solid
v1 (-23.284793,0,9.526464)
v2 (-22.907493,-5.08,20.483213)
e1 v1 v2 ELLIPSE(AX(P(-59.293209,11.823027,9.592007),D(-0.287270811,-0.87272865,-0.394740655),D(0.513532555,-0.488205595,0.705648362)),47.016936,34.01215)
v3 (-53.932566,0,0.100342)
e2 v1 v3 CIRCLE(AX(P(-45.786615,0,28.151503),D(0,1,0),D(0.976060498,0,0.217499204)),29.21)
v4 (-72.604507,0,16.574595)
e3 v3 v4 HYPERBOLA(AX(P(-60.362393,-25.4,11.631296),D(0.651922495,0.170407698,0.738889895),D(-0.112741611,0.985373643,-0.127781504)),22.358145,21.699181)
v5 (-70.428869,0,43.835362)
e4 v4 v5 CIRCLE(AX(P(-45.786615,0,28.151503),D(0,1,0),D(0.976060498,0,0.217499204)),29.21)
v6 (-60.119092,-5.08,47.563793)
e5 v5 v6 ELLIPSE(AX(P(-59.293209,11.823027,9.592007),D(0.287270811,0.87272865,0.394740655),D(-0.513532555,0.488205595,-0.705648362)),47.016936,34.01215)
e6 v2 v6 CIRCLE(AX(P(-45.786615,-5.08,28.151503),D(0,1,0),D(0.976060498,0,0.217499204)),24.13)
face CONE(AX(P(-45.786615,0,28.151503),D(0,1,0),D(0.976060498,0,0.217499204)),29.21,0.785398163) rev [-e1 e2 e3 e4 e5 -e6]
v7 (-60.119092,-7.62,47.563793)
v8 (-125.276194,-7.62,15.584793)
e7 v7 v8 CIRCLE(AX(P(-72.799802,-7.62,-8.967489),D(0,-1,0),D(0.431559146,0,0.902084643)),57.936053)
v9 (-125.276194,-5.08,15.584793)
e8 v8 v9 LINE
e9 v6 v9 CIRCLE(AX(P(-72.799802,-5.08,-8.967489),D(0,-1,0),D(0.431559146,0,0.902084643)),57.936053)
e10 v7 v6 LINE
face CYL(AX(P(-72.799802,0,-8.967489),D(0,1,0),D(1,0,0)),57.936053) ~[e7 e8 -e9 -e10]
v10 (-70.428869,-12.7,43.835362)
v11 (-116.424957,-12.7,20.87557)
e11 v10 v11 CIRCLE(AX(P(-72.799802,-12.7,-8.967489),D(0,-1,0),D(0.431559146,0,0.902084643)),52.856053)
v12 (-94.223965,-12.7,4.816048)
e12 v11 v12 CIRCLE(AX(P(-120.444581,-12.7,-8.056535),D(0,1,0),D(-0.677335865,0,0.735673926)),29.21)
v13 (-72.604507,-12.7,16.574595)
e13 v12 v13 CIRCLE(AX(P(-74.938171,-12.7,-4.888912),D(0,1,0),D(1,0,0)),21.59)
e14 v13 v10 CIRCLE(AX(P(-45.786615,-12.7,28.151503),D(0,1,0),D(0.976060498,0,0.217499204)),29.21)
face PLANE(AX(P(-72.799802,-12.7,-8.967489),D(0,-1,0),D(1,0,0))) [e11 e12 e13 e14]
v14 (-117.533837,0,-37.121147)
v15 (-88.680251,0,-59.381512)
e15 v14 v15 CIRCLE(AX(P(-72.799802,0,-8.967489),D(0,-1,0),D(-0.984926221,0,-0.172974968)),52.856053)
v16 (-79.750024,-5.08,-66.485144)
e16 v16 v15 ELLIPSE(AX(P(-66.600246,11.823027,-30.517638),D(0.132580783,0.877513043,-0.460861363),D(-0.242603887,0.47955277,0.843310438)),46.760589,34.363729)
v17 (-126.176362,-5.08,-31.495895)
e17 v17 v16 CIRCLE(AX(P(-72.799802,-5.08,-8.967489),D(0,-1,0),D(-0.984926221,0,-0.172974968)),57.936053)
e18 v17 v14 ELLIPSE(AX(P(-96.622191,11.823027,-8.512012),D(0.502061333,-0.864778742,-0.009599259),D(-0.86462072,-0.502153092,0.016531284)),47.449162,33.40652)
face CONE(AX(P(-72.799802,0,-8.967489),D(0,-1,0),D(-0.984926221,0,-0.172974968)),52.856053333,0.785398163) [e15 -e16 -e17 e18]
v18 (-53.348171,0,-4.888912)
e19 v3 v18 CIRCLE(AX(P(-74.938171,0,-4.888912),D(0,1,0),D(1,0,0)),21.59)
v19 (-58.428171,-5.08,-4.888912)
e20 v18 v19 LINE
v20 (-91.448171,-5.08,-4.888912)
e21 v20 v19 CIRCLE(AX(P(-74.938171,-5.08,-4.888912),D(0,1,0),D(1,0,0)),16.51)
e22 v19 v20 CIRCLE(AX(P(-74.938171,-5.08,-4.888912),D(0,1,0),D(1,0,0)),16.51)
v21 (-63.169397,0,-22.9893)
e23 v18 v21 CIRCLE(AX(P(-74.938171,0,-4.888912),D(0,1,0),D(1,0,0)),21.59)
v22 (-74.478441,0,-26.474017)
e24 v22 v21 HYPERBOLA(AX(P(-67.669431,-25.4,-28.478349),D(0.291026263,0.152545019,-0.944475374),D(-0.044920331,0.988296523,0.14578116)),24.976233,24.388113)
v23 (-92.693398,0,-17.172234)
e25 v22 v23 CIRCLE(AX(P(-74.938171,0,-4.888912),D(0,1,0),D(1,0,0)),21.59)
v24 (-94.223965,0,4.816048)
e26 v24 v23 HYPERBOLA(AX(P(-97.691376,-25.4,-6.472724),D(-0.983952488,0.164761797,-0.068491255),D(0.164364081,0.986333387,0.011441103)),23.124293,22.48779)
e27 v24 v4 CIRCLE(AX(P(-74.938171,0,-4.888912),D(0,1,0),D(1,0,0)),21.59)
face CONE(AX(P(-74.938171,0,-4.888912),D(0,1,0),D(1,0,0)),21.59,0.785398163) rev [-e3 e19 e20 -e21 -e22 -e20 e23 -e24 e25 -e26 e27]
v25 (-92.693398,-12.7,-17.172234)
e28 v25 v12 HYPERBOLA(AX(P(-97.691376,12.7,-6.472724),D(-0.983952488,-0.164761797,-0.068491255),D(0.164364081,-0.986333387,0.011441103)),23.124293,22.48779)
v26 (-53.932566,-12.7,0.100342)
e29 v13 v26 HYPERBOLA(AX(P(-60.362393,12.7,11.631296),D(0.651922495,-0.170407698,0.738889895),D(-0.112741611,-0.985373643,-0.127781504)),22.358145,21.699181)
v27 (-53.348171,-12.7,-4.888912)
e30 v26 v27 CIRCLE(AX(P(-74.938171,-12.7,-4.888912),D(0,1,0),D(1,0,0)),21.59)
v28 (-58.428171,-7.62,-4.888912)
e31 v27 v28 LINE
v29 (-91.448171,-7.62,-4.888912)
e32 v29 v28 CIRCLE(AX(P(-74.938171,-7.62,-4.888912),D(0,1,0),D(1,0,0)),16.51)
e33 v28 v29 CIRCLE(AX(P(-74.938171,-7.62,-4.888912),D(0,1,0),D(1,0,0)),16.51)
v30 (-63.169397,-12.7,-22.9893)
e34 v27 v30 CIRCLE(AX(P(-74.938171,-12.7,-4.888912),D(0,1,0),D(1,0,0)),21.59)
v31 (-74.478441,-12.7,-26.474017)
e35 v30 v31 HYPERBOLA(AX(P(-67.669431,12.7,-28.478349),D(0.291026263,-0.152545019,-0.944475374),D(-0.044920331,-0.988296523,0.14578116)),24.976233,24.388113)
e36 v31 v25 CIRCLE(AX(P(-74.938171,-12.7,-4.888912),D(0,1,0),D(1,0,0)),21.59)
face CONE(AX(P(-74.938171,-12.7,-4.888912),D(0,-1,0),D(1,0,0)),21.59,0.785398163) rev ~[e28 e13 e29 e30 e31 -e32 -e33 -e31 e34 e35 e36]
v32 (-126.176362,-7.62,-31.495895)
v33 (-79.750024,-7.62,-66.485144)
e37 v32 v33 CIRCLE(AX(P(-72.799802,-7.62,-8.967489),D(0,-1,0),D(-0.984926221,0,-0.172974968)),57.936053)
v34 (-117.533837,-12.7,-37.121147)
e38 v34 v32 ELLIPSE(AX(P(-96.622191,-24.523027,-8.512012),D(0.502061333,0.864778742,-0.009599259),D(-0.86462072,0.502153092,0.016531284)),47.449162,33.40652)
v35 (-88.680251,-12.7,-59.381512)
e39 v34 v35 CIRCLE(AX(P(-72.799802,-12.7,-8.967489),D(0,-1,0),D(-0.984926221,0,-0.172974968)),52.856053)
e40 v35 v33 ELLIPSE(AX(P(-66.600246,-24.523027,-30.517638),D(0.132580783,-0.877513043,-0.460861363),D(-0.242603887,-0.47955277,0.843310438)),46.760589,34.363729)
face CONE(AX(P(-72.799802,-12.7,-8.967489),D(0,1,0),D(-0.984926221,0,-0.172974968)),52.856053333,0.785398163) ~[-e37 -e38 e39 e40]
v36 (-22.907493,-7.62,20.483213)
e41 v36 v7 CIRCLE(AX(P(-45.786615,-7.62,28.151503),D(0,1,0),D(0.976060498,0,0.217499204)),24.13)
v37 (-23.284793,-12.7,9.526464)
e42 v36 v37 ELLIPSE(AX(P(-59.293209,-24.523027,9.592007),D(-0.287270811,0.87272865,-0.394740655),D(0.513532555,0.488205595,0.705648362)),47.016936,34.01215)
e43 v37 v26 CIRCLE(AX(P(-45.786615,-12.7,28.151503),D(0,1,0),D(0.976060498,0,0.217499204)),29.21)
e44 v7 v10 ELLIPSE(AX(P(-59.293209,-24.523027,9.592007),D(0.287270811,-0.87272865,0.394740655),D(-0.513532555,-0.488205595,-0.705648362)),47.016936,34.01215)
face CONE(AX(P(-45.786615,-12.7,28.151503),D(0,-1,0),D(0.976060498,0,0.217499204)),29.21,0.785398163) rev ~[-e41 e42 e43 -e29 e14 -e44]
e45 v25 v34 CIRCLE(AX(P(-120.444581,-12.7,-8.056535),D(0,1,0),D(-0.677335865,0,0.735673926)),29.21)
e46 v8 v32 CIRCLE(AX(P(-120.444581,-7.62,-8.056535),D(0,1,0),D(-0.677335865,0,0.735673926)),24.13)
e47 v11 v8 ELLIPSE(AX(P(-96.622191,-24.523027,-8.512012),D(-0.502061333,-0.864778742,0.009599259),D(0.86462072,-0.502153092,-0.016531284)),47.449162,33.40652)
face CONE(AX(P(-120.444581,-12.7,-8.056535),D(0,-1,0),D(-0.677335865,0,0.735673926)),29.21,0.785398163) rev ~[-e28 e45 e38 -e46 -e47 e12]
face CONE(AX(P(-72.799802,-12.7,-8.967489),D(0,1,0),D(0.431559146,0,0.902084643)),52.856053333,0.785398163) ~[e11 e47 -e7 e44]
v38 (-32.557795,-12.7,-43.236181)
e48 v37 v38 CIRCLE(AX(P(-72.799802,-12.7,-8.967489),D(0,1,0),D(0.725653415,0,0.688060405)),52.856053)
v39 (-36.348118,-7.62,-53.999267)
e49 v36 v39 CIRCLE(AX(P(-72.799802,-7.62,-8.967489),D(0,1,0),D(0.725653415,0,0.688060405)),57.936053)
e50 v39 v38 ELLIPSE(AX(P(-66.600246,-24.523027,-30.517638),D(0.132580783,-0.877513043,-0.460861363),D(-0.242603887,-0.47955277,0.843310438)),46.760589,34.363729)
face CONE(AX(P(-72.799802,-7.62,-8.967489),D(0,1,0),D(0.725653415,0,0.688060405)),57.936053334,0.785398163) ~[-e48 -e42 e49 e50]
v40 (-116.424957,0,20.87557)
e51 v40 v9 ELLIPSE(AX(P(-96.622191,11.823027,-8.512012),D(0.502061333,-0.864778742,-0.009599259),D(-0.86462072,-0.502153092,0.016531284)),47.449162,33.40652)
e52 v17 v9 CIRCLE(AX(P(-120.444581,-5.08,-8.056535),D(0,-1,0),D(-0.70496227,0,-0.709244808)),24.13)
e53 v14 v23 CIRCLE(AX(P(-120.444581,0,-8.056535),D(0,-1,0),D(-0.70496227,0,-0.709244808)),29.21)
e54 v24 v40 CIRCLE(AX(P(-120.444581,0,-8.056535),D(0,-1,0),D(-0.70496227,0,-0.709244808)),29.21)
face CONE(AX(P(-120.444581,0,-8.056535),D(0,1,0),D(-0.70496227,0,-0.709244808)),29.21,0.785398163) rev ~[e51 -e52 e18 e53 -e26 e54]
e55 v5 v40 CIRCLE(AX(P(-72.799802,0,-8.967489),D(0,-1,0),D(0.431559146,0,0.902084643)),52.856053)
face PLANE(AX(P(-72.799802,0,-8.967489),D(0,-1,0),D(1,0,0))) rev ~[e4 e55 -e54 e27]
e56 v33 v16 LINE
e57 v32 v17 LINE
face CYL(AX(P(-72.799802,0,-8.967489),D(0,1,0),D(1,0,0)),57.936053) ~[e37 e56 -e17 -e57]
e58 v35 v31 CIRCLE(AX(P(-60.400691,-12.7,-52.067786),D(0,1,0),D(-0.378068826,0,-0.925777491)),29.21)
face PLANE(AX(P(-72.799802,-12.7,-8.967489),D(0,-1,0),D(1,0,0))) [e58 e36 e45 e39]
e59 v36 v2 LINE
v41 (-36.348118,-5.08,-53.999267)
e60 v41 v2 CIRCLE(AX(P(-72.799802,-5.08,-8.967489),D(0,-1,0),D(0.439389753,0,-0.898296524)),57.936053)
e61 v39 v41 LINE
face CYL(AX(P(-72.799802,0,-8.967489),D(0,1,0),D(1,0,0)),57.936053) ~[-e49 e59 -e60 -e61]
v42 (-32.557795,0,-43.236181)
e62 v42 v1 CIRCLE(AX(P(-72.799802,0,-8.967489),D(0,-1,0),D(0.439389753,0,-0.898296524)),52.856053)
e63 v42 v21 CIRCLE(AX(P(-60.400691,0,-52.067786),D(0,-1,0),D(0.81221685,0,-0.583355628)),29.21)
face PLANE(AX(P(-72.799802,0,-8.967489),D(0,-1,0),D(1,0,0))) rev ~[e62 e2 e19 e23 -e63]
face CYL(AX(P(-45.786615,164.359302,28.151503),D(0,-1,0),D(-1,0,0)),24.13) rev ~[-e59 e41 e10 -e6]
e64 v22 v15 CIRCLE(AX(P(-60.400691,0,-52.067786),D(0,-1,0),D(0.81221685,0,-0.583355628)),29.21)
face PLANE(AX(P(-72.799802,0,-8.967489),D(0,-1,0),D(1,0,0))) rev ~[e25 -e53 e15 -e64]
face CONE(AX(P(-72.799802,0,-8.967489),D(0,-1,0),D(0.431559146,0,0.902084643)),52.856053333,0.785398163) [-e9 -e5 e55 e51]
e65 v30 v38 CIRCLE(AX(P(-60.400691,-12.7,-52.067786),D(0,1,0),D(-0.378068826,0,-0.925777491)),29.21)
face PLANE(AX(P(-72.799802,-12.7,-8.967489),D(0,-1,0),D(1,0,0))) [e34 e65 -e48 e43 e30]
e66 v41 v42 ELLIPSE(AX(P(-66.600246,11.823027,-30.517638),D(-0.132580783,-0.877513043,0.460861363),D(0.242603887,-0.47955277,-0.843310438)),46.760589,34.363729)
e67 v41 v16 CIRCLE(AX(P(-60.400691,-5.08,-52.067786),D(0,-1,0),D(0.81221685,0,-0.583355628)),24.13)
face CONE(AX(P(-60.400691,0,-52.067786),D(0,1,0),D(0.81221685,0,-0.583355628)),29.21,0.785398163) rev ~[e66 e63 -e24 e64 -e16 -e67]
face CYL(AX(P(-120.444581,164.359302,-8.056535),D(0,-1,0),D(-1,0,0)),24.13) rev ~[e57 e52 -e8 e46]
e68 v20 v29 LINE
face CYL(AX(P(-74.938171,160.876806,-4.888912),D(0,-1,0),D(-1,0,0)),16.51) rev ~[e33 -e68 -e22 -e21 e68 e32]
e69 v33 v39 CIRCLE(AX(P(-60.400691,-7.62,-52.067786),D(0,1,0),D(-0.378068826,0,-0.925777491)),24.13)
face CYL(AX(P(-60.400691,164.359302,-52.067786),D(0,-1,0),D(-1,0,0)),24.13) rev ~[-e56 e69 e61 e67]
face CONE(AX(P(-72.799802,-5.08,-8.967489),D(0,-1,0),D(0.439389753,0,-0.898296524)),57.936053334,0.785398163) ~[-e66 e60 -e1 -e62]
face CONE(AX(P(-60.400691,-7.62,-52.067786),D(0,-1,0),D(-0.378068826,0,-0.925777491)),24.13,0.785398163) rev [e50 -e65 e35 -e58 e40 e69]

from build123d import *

# Parameters (mm, degrees)
F0_R         = 57.9360533335
F2_DEPTH     = 12.7
F3_D         = 48.26
F5_D         = 33.02
F6_T2_ANGLE  = 283.4727948919
F6_T4_ANGLE  = 86.0712547595
F6_T6_ANGLE  = 107.4118170834
F6_T8_ANGLE  = 267.462303274
F6_T10_ANGLE = 277.2145700269
F6_T12_ANGLE = 103.4165555336
F6_T16_ANGLE = 107.4118170834
F6_T18_ANGLE = 283.4727948919
F6_T20_ANGLE = 277.2145700269
F6_T22_ANGLE = 86.0712547595
F6_T24_ANGLE = 103.4165555336
F6_T26_ANGLE = 267.462303274


# Not quite as in the source:
# - a fillet or chamfer that OpenCascade refuses, or shapes differently, is made with other operations: its cross-section is extruded or revolved along the edge and cut away or added


with BuildPart() as f2:
    # F0 (on Front) → F2 (new body)
    with BuildSketch(Plane.XZ):
        with Locations((-72.7998018265, -8.9674890041)):
            Circle(F0_R)
    extrude(amount=F2_DEPTH)

    # F3 (through all)
    with Locations(Plane(origin=(0, 0, 0), x_dir=(1, 0, 0), z_dir=(0, 1, 0))):
        with Locations((-45.7866154611, -28.1515028328), (-120.4445809126, 8.0565353855), (-60.4006908834, 52.0677864552)):
            Hole(F3_D / 2)

    # F5 (through all)
    with Locations(Plane(origin=(0, 0, 0), x_dir=(1, 0, 0), z_dir=(0, 1, 0))):
        with Locations((-74.9381706119, 4.8889117315)):
            Hole(F5_D / 2)

    # F6: chamfer of 5.08 on 14 edges, made by hand

    # F6_s1 → F6_t2 (revolve, cut)
    with BuildSketch(Plane(origin=(-33.5431340109, 0, 13.6983383479), x_dir=(0, 1, 0), z_dir=(0.9257774909, 0, -0.3780688263))):
        Polygon((-7.62, -95.1688030077), (-12.7, -100.2488030077), (-12.7, -95.1688030077), align=None)
    revolve(axis=Axis((-60.4006908834, -12.7, -52.0677864552), (0, 1, 0)), revolution_arc=F6_T2_ANGLE, mode=Mode.SUBTRACT)

    # F6_s3 → F6_t4 (revolve, cut)
    with BuildSketch(Plane(origin=(-0.6504253771, 0, 3.7035474889), x_dir=(0, 1, 0), z_dir=(-0.1729749681, 0, 0.9849262208))):
        Polygon((-12.7, 126.1096381457), (-7.62, 131.1896381457), (-12.7, 131.1896381457), align=None)
    revolve(axis=Axis((-72.7998018265, -12.7, -8.9674890041), (0, -1, 0)), revolution_arc=F6_T4_ANGLE, mode=Mode.SUBTRACT)

    # F6_s5 → F6_t6 (revolve, cut)
    with BuildSketch(Plane(origin=(-29.9879926822, 0, 31.6264228209), x_dir=(0, 1, 0), z_dir=(-0.6880604052, 0, 0.7256534151))):
        Polygon((-7.62, 1.0615455961), (-12.7, 6.1415455961), (-12.7, 1.0615455961), align=None)
    revolve(axis=Axis((-72.7998018265, -12.7, -8.9674890041), (0, 1, 0)), revolution_arc=F6_T6_ANGLE, mode=Mode.SUBTRACT)

    # F6_s7 → F6_t8 (revolve, cut)
    with BuildSketch(Plane(origin=(-69.201107614, 0, -63.7135426846), x_dir=(0, 1, 0), z_dir=(-0.7356739262, 0, -0.6773358652))):
        Polygon((-12.7, -104.8644514037), (-7.62, -99.7844514037), (-12.7, -99.7844514037), align=None)
    revolve(axis=Axis((-120.4445809126, -12.7, -8.0565353855), (0, 1, 0)), revolution_arc=F6_T8_ANGLE, mode=Mode.SUBTRACT)

    # F6_s9 → F6_t10 (revolve, cut)
    with BuildSketch(Plane(origin=(-8.1423267798, 0, 36.5399201696), x_dir=(0, 1, 0), z_dir=(-0.2174992035, 0, 0.9760604984))):
        Polygon((-12.7, 9.3575772605), (-7.62, 14.4375772605), (-12.7, 14.4375772605), align=None)
    revolve(axis=Axis((-45.7866154611, -12.7, 28.1515028328), (0, 1, 0)), revolution_arc=F6_T10_ANGLE, mode=Mode.SUBTRACT)

    # F6_s11 → F6_t12 (revolve, cut)
    with BuildSketch(Plane(origin=(-55.7502574842, 0, 26.6710376642), x_dir=(0, 1, 0), z_dir=(0.9020846433, 0, -0.4315591458))):
        Polygon((-12.7, 13.3491989235), (-7.62, 18.4291989235), (-12.7, 18.4291989235), align=None)
    revolve(axis=Axis((-72.7998018265, -12.7, -8.9674890041), (0, -1, 0)), revolution_arc=F6_T12_ANGLE, mode=Mode.SUBTRACT)

    # F6_s13 → F6_t14 (revolve, cut)
    with BuildSketch(Plane.XY.offset(-4.8889117315)):
        Polygon((-53.3481706119, -12.7), (-58.4281706119, -7.62), (-58.4281706119, -12.7), align=None)
    revolve(axis=Axis((-74.9381706119, -12.7, -4.8889117315), (0, 1, 0)), mode=Mode.SUBTRACT)

    # F6_s15 → F6_t16 (revolve, cut)
    with BuildSketch(Plane(origin=(-62.2843162467, 0, -30.4655418629), x_dir=(0, 1, 0), z_dir=(-0.8982965238, 0, -0.4393897533))):
        Polygon((-5.08, 34.004030567), (0, 28.924030567), (0, 34.004030567), align=None)
    revolve(axis=Axis((-72.7998018265, 0, -8.9674890041), (0, -1, 0)), revolution_arc=F6_T16_ANGLE, mode=Mode.SUBTRACT)

    # F6_s17 → F6_t18 (revolve, cut)
    with BuildSketch(Plane(origin=(-45.2248879791, 0, -62.9674495541), x_dir=(0, 1, 0), z_dir=(-0.5833556277, 0, -0.8122168501))):
        Polygon((0, 10.5255773581), (-5.08, 5.4455773581), (0, 5.4455773581), align=None)
    revolve(axis=Axis((-60.4006908834, 0, -52.0677864552), (0, -1, 0)), revolution_arc=F6_T18_ANGLE, mode=Mode.SUBTRACT)

    # F6_s19 → F6_t20 (revolve, cut)
    with BuildSketch(Plane(origin=(-8.1423267798, 0, 36.5399201696), x_dir=(0, 1, 0), z_dir=(-0.2174992035, 0, 0.9760604984))):
        Polygon((0, 9.3575772605), (-5.08, 14.4375772605), (0, 14.4375772605), align=None)
    revolve(axis=Axis((-45.7866154611, 0, 28.1515028328), (0, 1, 0)), revolution_arc=F6_T20_ANGLE, mode=Mode.SUBTRACT)

    # F6_s21 → F6_t22 (revolve, cut)
    with BuildSketch(Plane(origin=(-0.6504253771, 0, 3.7035474889), x_dir=(0, 1, 0), z_dir=(-0.1729749681, 0, 0.9849262208))):
        Polygon((0, 126.1096381457), (-5.08, 131.1896381457), (0, 131.1896381457), align=None)
    revolve(axis=Axis((-72.7998018265, 0, -8.9674890041), (0, -1, 0)), revolution_arc=F6_T22_ANGLE, mode=Mode.SUBTRACT)

    # F6_s23 → F6_t24 (revolve, cut)
    with BuildSketch(Plane(origin=(-55.7502574842, 0, 26.6710376642), x_dir=(0, 1, 0), z_dir=(0.9020846433, 0, -0.4315591458))):
        Polygon((0, 13.3491989235), (-5.08, 18.4291989235), (0, 18.4291989235), align=None)
    revolve(axis=Axis((-72.7998018265, 0, -8.9674890041), (0, -1, 0)), revolution_arc=F6_T24_ANGLE, mode=Mode.SUBTRACT)

    # F6_s25 → F6_t26 (revolve, cut)
    with BuildSketch(Plane(origin=(-56.5588266789, 0, 56.2173150628), x_dir=(0, 1, 0), z_dir=(-0.7092448082, 0, 0.7049622699))):
        Polygon((0, 119.832941055), (-5.08, 114.752941055), (0, 114.752941055), align=None)
    revolve(axis=Axis((-120.4445809126, 0, -8.0565353855), (0, -1, 0)), revolution_arc=F6_T26_ANGLE, mode=Mode.SUBTRACT)

    # F6_s27 → F6_t28 (revolve, cut)
    with BuildSketch(Plane.XY.offset(-4.8889117315)):
        Polygon((-53.3481706119, 0), (-58.4281706119, -5.08), (-58.4281706119, 0), align=None)
    revolve(axis=Axis((-74.9381706119, 0, -4.8889117315), (0, 1, 0)), mode=Mode.SUBTRACT)


solid = f2.part
